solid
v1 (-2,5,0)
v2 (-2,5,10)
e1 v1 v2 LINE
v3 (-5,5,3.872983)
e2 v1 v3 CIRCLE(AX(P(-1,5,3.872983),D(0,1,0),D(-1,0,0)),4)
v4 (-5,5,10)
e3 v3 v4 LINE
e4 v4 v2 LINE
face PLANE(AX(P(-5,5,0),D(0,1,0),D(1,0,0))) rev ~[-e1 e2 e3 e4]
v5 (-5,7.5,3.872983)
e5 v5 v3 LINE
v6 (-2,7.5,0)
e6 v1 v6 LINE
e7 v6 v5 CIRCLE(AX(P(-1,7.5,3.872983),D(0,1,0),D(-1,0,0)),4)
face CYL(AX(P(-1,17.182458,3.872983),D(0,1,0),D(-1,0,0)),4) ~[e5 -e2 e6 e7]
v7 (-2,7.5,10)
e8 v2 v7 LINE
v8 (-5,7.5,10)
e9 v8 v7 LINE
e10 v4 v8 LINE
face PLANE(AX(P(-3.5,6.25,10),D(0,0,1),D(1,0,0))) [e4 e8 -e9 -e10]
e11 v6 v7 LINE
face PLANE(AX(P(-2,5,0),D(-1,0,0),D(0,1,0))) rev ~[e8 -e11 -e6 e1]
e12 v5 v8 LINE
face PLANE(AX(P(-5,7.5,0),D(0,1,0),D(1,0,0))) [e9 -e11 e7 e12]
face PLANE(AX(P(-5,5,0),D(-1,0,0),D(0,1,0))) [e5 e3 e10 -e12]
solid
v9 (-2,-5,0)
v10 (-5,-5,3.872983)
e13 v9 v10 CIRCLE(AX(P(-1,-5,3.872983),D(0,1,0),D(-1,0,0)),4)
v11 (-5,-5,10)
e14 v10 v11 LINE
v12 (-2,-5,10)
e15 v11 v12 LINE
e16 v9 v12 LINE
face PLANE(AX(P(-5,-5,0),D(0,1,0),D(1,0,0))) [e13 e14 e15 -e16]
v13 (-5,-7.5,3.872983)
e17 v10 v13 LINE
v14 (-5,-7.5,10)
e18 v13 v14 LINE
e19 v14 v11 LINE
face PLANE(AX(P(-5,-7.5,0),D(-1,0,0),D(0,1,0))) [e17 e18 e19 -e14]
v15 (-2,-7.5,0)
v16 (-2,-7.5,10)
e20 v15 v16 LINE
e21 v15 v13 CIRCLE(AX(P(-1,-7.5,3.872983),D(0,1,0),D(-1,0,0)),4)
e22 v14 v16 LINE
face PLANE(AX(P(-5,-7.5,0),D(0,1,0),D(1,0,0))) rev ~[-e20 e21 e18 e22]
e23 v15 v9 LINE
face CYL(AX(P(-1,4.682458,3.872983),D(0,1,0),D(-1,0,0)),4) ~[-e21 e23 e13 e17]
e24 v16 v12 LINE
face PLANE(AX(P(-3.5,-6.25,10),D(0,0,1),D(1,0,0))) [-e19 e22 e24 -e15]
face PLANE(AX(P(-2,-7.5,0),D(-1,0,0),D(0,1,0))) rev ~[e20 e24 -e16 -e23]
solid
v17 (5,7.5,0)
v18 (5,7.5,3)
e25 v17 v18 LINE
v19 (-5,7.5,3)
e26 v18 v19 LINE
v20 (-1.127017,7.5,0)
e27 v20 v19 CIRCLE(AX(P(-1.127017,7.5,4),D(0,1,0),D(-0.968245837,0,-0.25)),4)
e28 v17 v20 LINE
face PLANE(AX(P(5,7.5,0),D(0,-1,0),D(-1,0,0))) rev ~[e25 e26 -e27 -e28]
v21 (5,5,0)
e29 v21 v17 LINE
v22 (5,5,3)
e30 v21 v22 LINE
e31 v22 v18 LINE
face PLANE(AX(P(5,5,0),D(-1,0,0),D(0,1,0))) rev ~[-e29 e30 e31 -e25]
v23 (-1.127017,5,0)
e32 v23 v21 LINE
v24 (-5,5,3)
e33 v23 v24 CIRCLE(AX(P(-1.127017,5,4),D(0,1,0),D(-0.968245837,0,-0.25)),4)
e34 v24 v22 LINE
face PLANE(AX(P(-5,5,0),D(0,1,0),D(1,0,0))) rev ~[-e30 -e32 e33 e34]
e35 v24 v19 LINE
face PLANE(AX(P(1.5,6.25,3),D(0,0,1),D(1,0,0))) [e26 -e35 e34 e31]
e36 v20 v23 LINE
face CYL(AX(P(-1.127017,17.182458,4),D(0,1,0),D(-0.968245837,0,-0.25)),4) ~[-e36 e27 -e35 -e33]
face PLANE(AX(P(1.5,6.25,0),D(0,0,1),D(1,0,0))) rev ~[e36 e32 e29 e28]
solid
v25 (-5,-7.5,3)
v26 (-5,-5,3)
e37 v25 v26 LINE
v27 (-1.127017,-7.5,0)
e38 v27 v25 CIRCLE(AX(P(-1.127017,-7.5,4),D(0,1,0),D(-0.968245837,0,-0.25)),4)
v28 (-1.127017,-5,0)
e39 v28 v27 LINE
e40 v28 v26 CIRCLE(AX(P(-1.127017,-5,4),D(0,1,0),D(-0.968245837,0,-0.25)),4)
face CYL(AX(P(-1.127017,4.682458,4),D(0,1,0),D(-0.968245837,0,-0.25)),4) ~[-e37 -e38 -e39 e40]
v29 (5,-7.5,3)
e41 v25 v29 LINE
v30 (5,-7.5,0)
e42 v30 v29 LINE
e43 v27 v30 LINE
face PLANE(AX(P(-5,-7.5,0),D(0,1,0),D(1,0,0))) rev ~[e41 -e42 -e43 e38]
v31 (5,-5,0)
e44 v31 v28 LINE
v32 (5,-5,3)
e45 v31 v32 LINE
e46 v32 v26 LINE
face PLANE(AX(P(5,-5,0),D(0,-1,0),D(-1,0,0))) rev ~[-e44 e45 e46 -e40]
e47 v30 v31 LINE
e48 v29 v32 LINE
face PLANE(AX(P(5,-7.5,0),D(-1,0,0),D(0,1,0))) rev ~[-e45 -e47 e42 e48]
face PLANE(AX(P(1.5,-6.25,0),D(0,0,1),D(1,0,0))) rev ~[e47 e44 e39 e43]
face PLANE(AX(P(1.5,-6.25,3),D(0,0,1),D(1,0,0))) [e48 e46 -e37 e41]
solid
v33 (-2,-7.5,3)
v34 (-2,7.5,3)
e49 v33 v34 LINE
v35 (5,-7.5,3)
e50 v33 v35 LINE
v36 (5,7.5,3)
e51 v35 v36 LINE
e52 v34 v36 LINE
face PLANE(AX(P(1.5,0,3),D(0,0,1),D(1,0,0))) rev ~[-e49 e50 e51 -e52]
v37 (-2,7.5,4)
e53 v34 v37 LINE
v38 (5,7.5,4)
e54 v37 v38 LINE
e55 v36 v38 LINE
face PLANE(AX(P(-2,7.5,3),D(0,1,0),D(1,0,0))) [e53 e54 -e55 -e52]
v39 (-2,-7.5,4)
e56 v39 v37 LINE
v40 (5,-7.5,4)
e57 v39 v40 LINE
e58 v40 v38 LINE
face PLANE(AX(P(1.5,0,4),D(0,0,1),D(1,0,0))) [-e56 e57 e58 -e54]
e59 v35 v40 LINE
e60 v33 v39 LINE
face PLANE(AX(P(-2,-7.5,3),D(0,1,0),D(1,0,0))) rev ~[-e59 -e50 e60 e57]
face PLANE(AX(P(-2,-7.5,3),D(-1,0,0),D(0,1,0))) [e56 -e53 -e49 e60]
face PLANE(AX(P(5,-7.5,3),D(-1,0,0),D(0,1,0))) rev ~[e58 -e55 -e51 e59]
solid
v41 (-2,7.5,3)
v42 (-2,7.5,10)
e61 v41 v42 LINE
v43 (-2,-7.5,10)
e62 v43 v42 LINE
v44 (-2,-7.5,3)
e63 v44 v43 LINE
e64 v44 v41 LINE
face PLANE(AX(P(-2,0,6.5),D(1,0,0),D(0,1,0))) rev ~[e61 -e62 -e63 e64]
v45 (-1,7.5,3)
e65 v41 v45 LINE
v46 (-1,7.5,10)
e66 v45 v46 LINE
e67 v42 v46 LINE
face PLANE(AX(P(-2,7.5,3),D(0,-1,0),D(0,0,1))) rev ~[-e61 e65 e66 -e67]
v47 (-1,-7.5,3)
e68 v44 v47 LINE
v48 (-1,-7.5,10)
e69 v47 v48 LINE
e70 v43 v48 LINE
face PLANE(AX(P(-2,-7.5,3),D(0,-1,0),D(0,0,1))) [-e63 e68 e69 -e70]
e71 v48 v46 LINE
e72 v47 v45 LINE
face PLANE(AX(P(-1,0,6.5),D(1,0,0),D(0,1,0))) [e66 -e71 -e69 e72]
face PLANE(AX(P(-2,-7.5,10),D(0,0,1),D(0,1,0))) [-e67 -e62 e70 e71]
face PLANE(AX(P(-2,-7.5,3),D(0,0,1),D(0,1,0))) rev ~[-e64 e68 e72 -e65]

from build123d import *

# Parameters (mm, degrees)
F0_W          = 7
F0_H          = 2.5
F0_W_2        = 3
F1_DEPTH      = 3
F2_DEPTH      = 10
F3_W          = 7
F3_H          = 15
F4_DEPTH      = 1
F5_W          = 15
F5_H          = 7
F6_DEPTH      = 1
F7_T1_DEPTH   = 21.864916731
F8_T1_DEPTH   = 21.864916731
F8_2_T1_DEPTH = 21.864916731
F9_T1_DEPTH   = 21.864916731


# Not quite as in the source:
# - a fillet or chamfer that OpenCascade refuses, or shapes differently, is made with other operations: its cross-section is extruded or revolved along the edge and cut away or added


with BuildPart() as f1:
    # F0 (on Top) → F1 (new body)
    with BuildSketch(Plane.XY):
        with Locations((1.5, -6.25)):
            Rectangle(F0_W, F0_H)
        with Locations((-3.5, -6.25)):
            Rectangle(F0_W_2, F0_H)
    extrude(amount=F1_DEPTH)

    # F7: fillet of radius 4 on 1 edges, made by hand

    # F7_s2 → F7_t1 (cut)
    with BuildSketch(Plane.XZ.offset(-4.6824583655)):
        with BuildLine():
            ThreePointArc((-5, 3), (-3.5765063966, 0.8377223398), (-1.1270166538, 0))
            Line((-1.1270166538, 0), (-5, 0))
            Line((-5, 0), (-5, 3))
        make_face()
    extrude(amount=F7_T1_DEPTH, mode=Mode.SUBTRACT)


with BuildPart() as f1b:
    # F0 (on Top) → F1, piece 2 (new body)
    with BuildSketch(Plane.XY):
        with Locations((1.5, 6.25)):
            Rectangle(F0_W, F0_H)
        with Locations((-3.5, 6.25)):
            Rectangle(F0_W_2, F0_H)
    extrude(amount=F1_DEPTH)

    # F8: fillet of radius 4 on 1 edges, made by hand

    # F8_s2 → F8_t1 (cut)
    with BuildSketch(Plane.XZ.offset(-17.1824583655)):
        with BuildLine():
            ThreePointArc((-5, 3), (-3.5765063966, 0.8377223398), (-1.1270166538, 0))
            Line((-1.1270166538, 0), (-5, 0))
            Line((-5, 0), (-5, 3))
        make_face()
    extrude(amount=F8_T1_DEPTH, mode=Mode.SUBTRACT)


with BuildPart() as f2:
    # F0 (on Top) → F2 (new body)
    with BuildSketch(Plane.XY):
        with Locations((-3.5, -6.25)):
            Rectangle(F0_W_2, F0_H)
    extrude(amount=F2_DEPTH)

    # F8#2: fillet of radius 4 on 1 edges, made by hand

    # F8_2_s2 → F8_2_t1 (cut)
    with BuildSketch(Plane.XZ.offset(-4.6824583655)):
        with BuildLine():
            ThreePointArc((-5, 3.8729833462), (-4.1622776602, 1.4234936034), (-2, 0))
            Line((-2, 0), (-5, 0))
            Line((-5, 0), (-5, 3.8729833462))
        make_face()
    extrude(amount=F8_2_T1_DEPTH, mode=Mode.SUBTRACT)


with BuildPart() as f2b:
    # F0 (on Top) → F2, piece 2 (new body)
    with BuildSketch(Plane.XY):
        with Locations((-3.5, 6.25)):
            Rectangle(F0_W_2, F0_H)
    extrude(amount=F2_DEPTH)

    # F9: fillet of radius 4 on 1 edges, made by hand

    # F9_s2 → F9_t1 (cut)
    with BuildSketch(Plane.XZ.offset(-17.1824583655)):
        with BuildLine():
            ThreePointArc((-5, 3.8729833462), (-4.1622776602, 1.4234936034), (-2, 0))
            Line((-2, 0), (-5, 0))
            Line((-5, 0), (-5, 3.8729833462))
        make_face()
    extrude(amount=F9_T1_DEPTH, mode=Mode.SUBTRACT)


with BuildPart() as f4:
    # F3 (on face) → F4 (new body)
    with BuildSketch(Plane.XY.offset(3)):
        with Locations((1.5, 0)):
            Rectangle(F3_W, F3_H)
    extrude(amount=F4_DEPTH)


with BuildPart() as f6:
    # F5 (on face) → F6 (new body)
    with BuildSketch(Plane.YZ.offset(-2)):
        with Locations((0, 6.5)):
            Rectangle(F5_W, F5_H)
    extrude(amount=F6_DEPTH)


solid = Compound([f1.part, f1b.part, f2.part, f2b.part, f4.part, f6.part])
